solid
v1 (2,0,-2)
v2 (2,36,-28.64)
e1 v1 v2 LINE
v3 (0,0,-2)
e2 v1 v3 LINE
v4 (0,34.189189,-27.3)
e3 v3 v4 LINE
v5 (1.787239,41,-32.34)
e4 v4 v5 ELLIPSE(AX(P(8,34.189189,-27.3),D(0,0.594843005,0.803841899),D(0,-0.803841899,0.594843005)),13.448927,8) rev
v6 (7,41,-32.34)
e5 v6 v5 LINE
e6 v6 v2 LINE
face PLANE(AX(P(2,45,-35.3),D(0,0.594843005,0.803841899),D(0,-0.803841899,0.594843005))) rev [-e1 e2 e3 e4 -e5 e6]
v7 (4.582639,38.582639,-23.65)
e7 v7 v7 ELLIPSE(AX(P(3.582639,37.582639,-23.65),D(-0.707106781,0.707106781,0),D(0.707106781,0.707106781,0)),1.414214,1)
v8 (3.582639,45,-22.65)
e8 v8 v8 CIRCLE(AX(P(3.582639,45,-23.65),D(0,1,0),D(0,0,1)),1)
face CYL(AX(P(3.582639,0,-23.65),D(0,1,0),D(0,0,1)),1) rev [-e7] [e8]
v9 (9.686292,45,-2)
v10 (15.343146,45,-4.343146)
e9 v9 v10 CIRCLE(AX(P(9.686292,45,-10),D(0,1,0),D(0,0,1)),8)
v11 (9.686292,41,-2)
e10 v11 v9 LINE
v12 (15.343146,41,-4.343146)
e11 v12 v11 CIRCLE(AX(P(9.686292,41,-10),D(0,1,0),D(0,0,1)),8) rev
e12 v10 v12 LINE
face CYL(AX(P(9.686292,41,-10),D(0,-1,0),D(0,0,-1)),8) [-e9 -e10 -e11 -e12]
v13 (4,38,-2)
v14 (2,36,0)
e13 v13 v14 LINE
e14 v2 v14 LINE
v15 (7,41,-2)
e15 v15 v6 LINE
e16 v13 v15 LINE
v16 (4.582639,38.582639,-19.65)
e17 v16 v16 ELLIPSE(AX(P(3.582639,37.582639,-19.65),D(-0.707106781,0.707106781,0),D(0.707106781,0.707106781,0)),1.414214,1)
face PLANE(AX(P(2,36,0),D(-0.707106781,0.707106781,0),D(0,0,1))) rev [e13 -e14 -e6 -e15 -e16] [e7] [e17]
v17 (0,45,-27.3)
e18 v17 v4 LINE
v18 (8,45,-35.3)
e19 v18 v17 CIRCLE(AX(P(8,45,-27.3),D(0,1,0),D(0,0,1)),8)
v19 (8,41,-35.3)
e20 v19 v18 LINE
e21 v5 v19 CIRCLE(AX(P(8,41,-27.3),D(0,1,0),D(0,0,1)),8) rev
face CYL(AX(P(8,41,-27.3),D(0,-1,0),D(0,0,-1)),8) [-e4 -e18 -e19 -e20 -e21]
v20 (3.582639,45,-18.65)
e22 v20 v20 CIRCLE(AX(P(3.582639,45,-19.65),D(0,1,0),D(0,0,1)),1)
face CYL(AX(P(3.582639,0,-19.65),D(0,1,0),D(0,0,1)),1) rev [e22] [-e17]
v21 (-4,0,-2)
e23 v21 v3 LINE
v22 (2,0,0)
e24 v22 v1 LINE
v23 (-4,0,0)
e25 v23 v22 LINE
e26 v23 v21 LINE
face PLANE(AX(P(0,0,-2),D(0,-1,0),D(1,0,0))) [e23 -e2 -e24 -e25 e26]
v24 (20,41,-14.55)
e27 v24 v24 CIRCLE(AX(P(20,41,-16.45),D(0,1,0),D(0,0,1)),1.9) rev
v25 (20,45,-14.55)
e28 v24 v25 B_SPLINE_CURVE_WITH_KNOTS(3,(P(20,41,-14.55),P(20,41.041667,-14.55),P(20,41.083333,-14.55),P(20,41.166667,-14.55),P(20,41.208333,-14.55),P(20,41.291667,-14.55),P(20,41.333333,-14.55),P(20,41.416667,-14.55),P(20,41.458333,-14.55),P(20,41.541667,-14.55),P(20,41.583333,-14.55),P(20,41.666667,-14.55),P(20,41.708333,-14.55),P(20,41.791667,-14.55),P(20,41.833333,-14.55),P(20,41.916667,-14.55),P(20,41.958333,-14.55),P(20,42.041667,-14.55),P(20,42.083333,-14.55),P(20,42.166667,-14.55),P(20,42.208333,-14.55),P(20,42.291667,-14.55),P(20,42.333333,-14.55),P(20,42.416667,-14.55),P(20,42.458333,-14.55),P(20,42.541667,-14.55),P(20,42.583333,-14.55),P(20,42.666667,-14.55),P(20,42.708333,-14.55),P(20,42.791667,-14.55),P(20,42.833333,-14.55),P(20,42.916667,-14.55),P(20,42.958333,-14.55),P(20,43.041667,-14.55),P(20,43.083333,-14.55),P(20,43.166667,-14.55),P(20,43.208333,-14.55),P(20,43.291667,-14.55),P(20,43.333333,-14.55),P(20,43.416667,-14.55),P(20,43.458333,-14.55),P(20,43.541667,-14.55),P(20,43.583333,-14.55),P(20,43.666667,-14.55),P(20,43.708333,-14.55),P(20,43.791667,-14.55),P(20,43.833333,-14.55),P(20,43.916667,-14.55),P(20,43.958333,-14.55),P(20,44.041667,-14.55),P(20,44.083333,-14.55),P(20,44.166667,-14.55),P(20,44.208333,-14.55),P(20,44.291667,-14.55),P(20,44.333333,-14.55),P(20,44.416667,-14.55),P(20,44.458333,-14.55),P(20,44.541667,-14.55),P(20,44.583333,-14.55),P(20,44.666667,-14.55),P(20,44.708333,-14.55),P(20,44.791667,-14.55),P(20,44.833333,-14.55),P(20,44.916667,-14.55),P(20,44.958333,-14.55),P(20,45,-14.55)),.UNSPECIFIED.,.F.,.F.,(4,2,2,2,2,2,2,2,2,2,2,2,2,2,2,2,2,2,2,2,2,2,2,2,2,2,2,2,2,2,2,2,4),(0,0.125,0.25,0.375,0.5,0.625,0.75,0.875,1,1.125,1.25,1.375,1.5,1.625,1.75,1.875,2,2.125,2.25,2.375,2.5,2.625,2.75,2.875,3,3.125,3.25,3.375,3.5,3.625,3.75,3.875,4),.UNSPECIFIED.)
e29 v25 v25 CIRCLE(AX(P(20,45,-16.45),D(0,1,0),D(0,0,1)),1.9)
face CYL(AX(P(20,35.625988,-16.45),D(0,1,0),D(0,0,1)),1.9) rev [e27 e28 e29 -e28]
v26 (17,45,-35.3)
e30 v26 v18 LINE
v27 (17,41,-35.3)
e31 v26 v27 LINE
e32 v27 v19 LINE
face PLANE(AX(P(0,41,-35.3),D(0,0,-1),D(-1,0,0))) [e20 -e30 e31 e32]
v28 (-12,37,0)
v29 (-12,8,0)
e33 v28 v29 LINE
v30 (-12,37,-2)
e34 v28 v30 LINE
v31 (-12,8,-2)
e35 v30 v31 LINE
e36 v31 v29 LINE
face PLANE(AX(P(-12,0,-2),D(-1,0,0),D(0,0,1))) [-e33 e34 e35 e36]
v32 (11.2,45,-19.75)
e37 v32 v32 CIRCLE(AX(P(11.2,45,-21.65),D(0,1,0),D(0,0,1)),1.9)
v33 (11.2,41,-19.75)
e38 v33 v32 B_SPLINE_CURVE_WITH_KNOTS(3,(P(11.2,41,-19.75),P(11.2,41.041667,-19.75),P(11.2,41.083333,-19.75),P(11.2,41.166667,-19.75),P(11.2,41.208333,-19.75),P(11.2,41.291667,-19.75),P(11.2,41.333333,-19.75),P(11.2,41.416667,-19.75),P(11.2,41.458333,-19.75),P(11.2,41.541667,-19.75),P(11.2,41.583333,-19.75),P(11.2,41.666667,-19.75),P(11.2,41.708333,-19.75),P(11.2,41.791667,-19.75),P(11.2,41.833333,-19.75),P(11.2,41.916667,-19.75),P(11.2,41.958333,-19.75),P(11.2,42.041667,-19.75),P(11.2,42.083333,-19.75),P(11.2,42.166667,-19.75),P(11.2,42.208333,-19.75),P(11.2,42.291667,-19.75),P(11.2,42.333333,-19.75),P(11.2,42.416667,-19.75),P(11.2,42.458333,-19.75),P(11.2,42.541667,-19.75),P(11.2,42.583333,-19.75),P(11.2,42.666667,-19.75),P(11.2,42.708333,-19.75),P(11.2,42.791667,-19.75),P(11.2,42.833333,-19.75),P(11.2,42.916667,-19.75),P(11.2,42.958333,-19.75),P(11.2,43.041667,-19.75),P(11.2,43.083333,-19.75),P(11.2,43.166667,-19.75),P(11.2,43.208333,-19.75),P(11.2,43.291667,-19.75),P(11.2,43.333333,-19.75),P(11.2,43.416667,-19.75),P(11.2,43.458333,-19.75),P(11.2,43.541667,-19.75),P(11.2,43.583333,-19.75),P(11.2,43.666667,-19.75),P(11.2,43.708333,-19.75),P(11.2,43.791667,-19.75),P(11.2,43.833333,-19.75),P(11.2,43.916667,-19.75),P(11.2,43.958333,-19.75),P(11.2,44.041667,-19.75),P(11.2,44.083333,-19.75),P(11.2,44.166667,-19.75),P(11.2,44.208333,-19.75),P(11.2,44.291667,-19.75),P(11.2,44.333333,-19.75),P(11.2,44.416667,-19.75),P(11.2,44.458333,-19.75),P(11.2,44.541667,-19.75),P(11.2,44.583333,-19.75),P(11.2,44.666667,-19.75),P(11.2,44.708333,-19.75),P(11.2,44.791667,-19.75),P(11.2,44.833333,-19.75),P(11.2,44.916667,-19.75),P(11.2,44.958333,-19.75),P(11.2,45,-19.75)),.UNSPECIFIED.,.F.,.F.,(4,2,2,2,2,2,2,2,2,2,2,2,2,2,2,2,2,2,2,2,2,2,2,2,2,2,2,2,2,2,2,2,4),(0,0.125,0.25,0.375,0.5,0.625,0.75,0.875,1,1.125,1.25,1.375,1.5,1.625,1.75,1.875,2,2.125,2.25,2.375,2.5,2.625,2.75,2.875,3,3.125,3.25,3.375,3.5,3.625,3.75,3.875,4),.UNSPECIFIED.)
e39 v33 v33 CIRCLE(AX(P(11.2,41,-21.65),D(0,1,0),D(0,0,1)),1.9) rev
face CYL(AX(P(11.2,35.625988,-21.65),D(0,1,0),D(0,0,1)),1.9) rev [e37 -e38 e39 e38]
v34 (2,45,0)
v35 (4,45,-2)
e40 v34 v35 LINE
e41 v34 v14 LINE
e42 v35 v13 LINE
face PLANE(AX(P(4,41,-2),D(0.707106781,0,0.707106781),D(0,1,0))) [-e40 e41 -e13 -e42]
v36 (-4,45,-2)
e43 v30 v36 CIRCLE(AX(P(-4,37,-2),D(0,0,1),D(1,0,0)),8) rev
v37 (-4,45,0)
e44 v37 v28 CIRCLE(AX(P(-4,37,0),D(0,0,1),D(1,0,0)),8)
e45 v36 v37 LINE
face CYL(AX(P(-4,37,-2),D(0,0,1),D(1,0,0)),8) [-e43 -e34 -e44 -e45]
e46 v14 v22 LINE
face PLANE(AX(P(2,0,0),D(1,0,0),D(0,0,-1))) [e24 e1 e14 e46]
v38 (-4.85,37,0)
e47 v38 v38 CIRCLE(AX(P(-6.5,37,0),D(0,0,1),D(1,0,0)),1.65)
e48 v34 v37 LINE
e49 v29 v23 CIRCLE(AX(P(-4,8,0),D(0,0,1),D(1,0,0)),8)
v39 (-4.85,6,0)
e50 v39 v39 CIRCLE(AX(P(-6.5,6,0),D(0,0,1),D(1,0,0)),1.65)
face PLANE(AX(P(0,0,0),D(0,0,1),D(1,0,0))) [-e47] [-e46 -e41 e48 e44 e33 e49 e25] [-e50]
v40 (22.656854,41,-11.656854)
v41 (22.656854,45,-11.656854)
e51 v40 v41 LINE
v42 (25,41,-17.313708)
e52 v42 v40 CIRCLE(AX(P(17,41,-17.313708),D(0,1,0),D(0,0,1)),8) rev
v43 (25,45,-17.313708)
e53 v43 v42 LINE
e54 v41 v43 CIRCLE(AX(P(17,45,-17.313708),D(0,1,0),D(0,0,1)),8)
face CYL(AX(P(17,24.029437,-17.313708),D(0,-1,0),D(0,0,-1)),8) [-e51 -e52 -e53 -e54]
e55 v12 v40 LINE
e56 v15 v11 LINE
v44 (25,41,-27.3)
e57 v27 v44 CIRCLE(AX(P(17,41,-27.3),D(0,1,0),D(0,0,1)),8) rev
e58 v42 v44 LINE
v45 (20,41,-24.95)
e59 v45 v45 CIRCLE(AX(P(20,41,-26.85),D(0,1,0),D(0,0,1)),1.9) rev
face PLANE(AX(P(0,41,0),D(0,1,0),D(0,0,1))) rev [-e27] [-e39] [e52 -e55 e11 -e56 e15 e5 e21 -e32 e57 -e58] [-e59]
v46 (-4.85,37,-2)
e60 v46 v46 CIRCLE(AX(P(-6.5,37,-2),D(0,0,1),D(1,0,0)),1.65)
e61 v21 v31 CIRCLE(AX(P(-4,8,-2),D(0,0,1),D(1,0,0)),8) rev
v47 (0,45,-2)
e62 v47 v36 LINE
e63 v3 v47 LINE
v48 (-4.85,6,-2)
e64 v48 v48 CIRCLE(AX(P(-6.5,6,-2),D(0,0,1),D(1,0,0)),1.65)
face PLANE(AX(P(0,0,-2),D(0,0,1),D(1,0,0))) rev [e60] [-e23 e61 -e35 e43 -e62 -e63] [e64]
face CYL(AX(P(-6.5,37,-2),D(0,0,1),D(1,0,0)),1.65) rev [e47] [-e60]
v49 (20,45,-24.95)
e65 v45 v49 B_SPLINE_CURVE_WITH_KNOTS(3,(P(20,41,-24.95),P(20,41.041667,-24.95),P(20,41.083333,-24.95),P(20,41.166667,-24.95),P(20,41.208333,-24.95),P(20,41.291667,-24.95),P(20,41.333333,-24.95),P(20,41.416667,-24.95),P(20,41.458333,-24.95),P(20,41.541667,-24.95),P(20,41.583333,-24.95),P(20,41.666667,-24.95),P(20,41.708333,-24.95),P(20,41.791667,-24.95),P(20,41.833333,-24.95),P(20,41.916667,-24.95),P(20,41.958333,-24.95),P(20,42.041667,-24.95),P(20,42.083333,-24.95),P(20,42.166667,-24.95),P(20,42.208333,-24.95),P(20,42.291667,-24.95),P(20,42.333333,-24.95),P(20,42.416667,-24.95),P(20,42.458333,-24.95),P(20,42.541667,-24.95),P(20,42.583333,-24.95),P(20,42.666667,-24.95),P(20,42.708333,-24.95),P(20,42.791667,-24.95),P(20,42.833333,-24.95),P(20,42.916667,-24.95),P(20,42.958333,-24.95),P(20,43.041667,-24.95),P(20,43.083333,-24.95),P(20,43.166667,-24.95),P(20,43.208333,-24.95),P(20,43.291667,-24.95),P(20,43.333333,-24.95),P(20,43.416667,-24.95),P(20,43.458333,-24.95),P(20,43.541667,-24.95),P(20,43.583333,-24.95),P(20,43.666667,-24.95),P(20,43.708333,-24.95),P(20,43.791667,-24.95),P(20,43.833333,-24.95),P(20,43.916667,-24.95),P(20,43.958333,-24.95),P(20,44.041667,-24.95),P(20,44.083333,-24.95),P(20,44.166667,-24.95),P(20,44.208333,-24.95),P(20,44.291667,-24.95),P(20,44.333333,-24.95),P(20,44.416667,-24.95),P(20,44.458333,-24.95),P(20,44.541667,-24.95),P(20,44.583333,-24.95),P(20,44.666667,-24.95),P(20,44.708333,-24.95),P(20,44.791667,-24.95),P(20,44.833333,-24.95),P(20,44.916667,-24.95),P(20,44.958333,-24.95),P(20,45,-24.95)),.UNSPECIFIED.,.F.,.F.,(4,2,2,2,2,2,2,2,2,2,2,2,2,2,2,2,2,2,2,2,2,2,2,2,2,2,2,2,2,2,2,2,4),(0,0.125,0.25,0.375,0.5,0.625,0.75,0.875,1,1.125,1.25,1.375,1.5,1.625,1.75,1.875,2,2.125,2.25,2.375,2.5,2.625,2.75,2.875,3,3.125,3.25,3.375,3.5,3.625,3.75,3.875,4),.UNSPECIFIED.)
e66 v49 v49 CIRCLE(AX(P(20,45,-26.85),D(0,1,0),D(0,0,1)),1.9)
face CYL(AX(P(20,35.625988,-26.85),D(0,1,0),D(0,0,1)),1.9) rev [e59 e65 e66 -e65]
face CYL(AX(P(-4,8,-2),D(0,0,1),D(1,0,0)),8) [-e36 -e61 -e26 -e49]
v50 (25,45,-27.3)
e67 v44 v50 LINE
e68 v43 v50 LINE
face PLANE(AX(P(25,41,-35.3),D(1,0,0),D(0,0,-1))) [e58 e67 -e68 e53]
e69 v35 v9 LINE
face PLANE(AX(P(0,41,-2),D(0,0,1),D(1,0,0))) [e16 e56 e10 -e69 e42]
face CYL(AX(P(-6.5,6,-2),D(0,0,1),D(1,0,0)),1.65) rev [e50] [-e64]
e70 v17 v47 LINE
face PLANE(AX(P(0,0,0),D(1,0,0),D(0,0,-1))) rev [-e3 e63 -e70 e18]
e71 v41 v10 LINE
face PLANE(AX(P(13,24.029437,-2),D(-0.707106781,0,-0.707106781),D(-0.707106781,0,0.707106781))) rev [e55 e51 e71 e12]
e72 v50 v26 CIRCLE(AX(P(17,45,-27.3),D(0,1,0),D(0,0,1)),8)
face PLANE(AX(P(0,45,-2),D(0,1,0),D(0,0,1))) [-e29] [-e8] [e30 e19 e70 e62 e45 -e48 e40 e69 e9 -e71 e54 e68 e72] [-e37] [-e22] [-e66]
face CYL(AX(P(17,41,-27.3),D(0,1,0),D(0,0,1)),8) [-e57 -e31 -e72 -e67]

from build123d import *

# Parameters (mm, degrees)
SKETCH1_R           = 1.6500000000000001
SKETCH1_R_2         = 1.6500000000000006
BOSS_EXTRUDE1_DEPTH = 2
BOSS_EXTRUDE2_DEPTH = 2
BOSS_EXTRUDE3_DEPTH = 4
SKETCH4_R           = 1.8999999999999948
SKETCH4_R_2         = 1.8999999999999981
CUT_EXTRUDE1_DEPTH  = 4
SKETCH5_R           = 1.0000000000000009
SKETCH5_R_2         = 1
SKETCH5_R_3         = 1.8999999999999981
CUT_EXTRUDE2_DEPTH  = 63.418667079648536
CUT_EXTRUDE3_DEPTH  = 4
CHAMFER1_SIZE       = 5
CHAMFER2_SIZE       = 2
FILLET1_R           = 8
FILLET2_R           = 8
FILLET3_R           = 8


# Some blends are built 0.0001 mm under size
with BuildPart() as part:
    # Sketch1 → Boss-Extrude1 (new body)
    with BuildSketch(Plane.XY):
        Polygon((0, 0), (-12, -1.47e-15), (-12, 45), (0, 45), align=None)
        with Locations((-6.499999999999999, 37)):
            Circle(SKETCH1_R, mode=Mode.SUBTRACT)
        with Locations((-6.5000000000000036, 5.999999999999999)):
            Circle(SKETCH1_R_2, mode=Mode.SUBTRACT)
    extrude(amount=-BOSS_EXTRUDE1_DEPTH)

    # Sketch2 → Boss-Extrude2 (add)
    with BuildSketch(Plane(origin=(0, 0, 0), x_dir=(0, 0, -1), z_dir=(1, 0, 0))):
        Polygon((35.3, 45), (2, 0), (5.51e-15, 0), (0, 45), align=None)
    extrude(amount=BOSS_EXTRUDE2_DEPTH)

    # Sketch3 → Boss-Extrude3 (add)
    with BuildSketch(Plane(origin=(0, 45, 0), x_dir=(1, 0, 0), z_dir=(0, 1, 0))):
        Polygon((-6.1e-16, 35.3), (25, 35.3), (25.000000000000004, 1.9999999999999991), (3.47e-15, 1.9999999999999991), align=None)
    extrude(amount=-BOSS_EXTRUDE3_DEPTH)

    # Sketch4 → Cut-Extrude1 (cut)
    with BuildSketch(Plane(origin=(0, 45, 0), x_dir=(1, 0, 0), z_dir=(0, 1, 0))):
        with Locations(Location((20.000000000000004, 26.850000000000005, 0), (0, 0, 270))):
            Circle(SKETCH4_R)
        with Locations(Location((20.00000000000001, 16.45, 0), (0, 0, 270))):
            Circle(SKETCH4_R)
        with Locations(Location((11.200000000000008, 21.650000000000002, 0), (0, 0, 270))):
            Circle(SKETCH4_R_2)
    extrude(amount=-CUT_EXTRUDE1_DEPTH, mode=Mode.SUBTRACT)

    # Sketch5 → Cut-Extrude2 (cut, through all)
    with BuildSketch(Plane(origin=(0, 45, 0), x_dir=(1, 0, 0), z_dir=(0, 1, 0))):
        with Locations(Location((3.5826389249908894, 23.65, 0), (0, 0, 270))):
            Circle(SKETCH5_R)
        with Locations(Location((3.5826389249908894, 19.650000000000002, 0), (0, 0, 270))):
            Circle(SKETCH5_R_2)
        with Locations(Location((11.200000000000008, 21.650000000000002, 0), (0, 0, 270))):
            Circle(SKETCH5_R_3)
    extrude(amount=-CUT_EXTRUDE2_DEPTH, mode=Mode.SUBTRACT)

    # Sketch6 → Cut-Extrude3 (cut)
    with BuildSketch(Plane(origin=(0, 45, 0), x_dir=(1, 0, 0), z_dir=(0, 1, 0))):
        Polygon((13.000000000000005, 1.9999999999999991), (25.000000000000004, 13.999999999999877), (25.000000000000004, 1.9999999999999991), align=None)
    extrude(amount=-CUT_EXTRUDE3_DEPTH, mode=Mode.SUBTRACT)

    # Chamfer1
    # the kernel refuses this chamfer: 5 mm, written as the material it adds along each edge
    with BuildSketch(Plane(origin=(2, 41, -45.19841493982955), x_dir=(-0.02749587661058636, -0.9996219169112968, 0), z_dir=(0, 0, 1))) as chamfer1_piece_1_section:
        Polygon((CHAMFER1_SIZE * 0.999621916911, CHAMFER1_SIZE * 0.0274958766106), (-CHAMFER1_SIZE * 0.0274958766106, CHAMFER1_SIZE * 0.999621916911), (0, 0), align=None)
    chamfer1_piece_1 = extrude(amount=43.19841493982955, mode=Mode.PRIVATE)
    chamfer1_piece_1 = split(chamfer1_piece_1, bisect_by=Plane(origin=(3.679771833975431, 32.284665683470884, -25.89065260576845), z_dir=(0, 0.5948430054102947, 0.8038418992031009)), keep=Keep.TOP, mode=Mode.PRIVATE)
    chamfer1_piece_1 = chamfer1_piece_1 - Plane(origin=(3.5826389249908894, 39.396771086693036, -19.650000000000002), x_dir=(-1.8e-16, 0, 1), z_dir=(0, 1, 0)) * Cylinder(1, 107, mode=Mode.PRIVATE)
    chamfer1_piece_1 = chamfer1_piece_1 - Plane(origin=(3.5826389249908894, 39.396771086693036, -23.65), x_dir=(-1.8e-16, 0, 1), z_dir=(0, 1, 0)) * Cylinder(1.0000000000000009, 107, mode=Mode.PRIVATE)
    add(chamfer1_piece_1)

    # Chamfer2
    chamfer2_edges = [part.edges().sort_by_distance(p)[0] for p in [
        (1.9999999999990004, 40.50000000000074, -1.9999999999999996),
    ]]
    chamfer(chamfer2_edges, length=CHAMFER2_SIZE - 0.0001)  # a hair under: the kernel refuses the full size

    # Fillet1
    fillet1_edges = [part.edges().sort_by_distance(p)[0] for p in [
        (-12, -1.47e-15, -1),
        (-12, 45, -1),
    ]]
    fillet(fillet1_edges, radius=FILLET1_R)

    # Fillet2
    fillet2_edges = [part.edges().sort_by_distance(p)[0] for p in [
        (-6.1e-16, 43, -35.3),
        (25, 43, -35.3),
    ]]
    fillet(fillet2_edges, radius=FILLET2_R)

    # Fillet3
    fillet3_edges = [part.edges().sort_by_distance(p)[0] for p in [
        (13.000000000000005, 43, -1.9999999999999991),
        (25.000000000000004, 43, -13.999999999999877),
    ]]
    fillet(fillet3_edges, radius=FILLET3_R)


solid = part.part
